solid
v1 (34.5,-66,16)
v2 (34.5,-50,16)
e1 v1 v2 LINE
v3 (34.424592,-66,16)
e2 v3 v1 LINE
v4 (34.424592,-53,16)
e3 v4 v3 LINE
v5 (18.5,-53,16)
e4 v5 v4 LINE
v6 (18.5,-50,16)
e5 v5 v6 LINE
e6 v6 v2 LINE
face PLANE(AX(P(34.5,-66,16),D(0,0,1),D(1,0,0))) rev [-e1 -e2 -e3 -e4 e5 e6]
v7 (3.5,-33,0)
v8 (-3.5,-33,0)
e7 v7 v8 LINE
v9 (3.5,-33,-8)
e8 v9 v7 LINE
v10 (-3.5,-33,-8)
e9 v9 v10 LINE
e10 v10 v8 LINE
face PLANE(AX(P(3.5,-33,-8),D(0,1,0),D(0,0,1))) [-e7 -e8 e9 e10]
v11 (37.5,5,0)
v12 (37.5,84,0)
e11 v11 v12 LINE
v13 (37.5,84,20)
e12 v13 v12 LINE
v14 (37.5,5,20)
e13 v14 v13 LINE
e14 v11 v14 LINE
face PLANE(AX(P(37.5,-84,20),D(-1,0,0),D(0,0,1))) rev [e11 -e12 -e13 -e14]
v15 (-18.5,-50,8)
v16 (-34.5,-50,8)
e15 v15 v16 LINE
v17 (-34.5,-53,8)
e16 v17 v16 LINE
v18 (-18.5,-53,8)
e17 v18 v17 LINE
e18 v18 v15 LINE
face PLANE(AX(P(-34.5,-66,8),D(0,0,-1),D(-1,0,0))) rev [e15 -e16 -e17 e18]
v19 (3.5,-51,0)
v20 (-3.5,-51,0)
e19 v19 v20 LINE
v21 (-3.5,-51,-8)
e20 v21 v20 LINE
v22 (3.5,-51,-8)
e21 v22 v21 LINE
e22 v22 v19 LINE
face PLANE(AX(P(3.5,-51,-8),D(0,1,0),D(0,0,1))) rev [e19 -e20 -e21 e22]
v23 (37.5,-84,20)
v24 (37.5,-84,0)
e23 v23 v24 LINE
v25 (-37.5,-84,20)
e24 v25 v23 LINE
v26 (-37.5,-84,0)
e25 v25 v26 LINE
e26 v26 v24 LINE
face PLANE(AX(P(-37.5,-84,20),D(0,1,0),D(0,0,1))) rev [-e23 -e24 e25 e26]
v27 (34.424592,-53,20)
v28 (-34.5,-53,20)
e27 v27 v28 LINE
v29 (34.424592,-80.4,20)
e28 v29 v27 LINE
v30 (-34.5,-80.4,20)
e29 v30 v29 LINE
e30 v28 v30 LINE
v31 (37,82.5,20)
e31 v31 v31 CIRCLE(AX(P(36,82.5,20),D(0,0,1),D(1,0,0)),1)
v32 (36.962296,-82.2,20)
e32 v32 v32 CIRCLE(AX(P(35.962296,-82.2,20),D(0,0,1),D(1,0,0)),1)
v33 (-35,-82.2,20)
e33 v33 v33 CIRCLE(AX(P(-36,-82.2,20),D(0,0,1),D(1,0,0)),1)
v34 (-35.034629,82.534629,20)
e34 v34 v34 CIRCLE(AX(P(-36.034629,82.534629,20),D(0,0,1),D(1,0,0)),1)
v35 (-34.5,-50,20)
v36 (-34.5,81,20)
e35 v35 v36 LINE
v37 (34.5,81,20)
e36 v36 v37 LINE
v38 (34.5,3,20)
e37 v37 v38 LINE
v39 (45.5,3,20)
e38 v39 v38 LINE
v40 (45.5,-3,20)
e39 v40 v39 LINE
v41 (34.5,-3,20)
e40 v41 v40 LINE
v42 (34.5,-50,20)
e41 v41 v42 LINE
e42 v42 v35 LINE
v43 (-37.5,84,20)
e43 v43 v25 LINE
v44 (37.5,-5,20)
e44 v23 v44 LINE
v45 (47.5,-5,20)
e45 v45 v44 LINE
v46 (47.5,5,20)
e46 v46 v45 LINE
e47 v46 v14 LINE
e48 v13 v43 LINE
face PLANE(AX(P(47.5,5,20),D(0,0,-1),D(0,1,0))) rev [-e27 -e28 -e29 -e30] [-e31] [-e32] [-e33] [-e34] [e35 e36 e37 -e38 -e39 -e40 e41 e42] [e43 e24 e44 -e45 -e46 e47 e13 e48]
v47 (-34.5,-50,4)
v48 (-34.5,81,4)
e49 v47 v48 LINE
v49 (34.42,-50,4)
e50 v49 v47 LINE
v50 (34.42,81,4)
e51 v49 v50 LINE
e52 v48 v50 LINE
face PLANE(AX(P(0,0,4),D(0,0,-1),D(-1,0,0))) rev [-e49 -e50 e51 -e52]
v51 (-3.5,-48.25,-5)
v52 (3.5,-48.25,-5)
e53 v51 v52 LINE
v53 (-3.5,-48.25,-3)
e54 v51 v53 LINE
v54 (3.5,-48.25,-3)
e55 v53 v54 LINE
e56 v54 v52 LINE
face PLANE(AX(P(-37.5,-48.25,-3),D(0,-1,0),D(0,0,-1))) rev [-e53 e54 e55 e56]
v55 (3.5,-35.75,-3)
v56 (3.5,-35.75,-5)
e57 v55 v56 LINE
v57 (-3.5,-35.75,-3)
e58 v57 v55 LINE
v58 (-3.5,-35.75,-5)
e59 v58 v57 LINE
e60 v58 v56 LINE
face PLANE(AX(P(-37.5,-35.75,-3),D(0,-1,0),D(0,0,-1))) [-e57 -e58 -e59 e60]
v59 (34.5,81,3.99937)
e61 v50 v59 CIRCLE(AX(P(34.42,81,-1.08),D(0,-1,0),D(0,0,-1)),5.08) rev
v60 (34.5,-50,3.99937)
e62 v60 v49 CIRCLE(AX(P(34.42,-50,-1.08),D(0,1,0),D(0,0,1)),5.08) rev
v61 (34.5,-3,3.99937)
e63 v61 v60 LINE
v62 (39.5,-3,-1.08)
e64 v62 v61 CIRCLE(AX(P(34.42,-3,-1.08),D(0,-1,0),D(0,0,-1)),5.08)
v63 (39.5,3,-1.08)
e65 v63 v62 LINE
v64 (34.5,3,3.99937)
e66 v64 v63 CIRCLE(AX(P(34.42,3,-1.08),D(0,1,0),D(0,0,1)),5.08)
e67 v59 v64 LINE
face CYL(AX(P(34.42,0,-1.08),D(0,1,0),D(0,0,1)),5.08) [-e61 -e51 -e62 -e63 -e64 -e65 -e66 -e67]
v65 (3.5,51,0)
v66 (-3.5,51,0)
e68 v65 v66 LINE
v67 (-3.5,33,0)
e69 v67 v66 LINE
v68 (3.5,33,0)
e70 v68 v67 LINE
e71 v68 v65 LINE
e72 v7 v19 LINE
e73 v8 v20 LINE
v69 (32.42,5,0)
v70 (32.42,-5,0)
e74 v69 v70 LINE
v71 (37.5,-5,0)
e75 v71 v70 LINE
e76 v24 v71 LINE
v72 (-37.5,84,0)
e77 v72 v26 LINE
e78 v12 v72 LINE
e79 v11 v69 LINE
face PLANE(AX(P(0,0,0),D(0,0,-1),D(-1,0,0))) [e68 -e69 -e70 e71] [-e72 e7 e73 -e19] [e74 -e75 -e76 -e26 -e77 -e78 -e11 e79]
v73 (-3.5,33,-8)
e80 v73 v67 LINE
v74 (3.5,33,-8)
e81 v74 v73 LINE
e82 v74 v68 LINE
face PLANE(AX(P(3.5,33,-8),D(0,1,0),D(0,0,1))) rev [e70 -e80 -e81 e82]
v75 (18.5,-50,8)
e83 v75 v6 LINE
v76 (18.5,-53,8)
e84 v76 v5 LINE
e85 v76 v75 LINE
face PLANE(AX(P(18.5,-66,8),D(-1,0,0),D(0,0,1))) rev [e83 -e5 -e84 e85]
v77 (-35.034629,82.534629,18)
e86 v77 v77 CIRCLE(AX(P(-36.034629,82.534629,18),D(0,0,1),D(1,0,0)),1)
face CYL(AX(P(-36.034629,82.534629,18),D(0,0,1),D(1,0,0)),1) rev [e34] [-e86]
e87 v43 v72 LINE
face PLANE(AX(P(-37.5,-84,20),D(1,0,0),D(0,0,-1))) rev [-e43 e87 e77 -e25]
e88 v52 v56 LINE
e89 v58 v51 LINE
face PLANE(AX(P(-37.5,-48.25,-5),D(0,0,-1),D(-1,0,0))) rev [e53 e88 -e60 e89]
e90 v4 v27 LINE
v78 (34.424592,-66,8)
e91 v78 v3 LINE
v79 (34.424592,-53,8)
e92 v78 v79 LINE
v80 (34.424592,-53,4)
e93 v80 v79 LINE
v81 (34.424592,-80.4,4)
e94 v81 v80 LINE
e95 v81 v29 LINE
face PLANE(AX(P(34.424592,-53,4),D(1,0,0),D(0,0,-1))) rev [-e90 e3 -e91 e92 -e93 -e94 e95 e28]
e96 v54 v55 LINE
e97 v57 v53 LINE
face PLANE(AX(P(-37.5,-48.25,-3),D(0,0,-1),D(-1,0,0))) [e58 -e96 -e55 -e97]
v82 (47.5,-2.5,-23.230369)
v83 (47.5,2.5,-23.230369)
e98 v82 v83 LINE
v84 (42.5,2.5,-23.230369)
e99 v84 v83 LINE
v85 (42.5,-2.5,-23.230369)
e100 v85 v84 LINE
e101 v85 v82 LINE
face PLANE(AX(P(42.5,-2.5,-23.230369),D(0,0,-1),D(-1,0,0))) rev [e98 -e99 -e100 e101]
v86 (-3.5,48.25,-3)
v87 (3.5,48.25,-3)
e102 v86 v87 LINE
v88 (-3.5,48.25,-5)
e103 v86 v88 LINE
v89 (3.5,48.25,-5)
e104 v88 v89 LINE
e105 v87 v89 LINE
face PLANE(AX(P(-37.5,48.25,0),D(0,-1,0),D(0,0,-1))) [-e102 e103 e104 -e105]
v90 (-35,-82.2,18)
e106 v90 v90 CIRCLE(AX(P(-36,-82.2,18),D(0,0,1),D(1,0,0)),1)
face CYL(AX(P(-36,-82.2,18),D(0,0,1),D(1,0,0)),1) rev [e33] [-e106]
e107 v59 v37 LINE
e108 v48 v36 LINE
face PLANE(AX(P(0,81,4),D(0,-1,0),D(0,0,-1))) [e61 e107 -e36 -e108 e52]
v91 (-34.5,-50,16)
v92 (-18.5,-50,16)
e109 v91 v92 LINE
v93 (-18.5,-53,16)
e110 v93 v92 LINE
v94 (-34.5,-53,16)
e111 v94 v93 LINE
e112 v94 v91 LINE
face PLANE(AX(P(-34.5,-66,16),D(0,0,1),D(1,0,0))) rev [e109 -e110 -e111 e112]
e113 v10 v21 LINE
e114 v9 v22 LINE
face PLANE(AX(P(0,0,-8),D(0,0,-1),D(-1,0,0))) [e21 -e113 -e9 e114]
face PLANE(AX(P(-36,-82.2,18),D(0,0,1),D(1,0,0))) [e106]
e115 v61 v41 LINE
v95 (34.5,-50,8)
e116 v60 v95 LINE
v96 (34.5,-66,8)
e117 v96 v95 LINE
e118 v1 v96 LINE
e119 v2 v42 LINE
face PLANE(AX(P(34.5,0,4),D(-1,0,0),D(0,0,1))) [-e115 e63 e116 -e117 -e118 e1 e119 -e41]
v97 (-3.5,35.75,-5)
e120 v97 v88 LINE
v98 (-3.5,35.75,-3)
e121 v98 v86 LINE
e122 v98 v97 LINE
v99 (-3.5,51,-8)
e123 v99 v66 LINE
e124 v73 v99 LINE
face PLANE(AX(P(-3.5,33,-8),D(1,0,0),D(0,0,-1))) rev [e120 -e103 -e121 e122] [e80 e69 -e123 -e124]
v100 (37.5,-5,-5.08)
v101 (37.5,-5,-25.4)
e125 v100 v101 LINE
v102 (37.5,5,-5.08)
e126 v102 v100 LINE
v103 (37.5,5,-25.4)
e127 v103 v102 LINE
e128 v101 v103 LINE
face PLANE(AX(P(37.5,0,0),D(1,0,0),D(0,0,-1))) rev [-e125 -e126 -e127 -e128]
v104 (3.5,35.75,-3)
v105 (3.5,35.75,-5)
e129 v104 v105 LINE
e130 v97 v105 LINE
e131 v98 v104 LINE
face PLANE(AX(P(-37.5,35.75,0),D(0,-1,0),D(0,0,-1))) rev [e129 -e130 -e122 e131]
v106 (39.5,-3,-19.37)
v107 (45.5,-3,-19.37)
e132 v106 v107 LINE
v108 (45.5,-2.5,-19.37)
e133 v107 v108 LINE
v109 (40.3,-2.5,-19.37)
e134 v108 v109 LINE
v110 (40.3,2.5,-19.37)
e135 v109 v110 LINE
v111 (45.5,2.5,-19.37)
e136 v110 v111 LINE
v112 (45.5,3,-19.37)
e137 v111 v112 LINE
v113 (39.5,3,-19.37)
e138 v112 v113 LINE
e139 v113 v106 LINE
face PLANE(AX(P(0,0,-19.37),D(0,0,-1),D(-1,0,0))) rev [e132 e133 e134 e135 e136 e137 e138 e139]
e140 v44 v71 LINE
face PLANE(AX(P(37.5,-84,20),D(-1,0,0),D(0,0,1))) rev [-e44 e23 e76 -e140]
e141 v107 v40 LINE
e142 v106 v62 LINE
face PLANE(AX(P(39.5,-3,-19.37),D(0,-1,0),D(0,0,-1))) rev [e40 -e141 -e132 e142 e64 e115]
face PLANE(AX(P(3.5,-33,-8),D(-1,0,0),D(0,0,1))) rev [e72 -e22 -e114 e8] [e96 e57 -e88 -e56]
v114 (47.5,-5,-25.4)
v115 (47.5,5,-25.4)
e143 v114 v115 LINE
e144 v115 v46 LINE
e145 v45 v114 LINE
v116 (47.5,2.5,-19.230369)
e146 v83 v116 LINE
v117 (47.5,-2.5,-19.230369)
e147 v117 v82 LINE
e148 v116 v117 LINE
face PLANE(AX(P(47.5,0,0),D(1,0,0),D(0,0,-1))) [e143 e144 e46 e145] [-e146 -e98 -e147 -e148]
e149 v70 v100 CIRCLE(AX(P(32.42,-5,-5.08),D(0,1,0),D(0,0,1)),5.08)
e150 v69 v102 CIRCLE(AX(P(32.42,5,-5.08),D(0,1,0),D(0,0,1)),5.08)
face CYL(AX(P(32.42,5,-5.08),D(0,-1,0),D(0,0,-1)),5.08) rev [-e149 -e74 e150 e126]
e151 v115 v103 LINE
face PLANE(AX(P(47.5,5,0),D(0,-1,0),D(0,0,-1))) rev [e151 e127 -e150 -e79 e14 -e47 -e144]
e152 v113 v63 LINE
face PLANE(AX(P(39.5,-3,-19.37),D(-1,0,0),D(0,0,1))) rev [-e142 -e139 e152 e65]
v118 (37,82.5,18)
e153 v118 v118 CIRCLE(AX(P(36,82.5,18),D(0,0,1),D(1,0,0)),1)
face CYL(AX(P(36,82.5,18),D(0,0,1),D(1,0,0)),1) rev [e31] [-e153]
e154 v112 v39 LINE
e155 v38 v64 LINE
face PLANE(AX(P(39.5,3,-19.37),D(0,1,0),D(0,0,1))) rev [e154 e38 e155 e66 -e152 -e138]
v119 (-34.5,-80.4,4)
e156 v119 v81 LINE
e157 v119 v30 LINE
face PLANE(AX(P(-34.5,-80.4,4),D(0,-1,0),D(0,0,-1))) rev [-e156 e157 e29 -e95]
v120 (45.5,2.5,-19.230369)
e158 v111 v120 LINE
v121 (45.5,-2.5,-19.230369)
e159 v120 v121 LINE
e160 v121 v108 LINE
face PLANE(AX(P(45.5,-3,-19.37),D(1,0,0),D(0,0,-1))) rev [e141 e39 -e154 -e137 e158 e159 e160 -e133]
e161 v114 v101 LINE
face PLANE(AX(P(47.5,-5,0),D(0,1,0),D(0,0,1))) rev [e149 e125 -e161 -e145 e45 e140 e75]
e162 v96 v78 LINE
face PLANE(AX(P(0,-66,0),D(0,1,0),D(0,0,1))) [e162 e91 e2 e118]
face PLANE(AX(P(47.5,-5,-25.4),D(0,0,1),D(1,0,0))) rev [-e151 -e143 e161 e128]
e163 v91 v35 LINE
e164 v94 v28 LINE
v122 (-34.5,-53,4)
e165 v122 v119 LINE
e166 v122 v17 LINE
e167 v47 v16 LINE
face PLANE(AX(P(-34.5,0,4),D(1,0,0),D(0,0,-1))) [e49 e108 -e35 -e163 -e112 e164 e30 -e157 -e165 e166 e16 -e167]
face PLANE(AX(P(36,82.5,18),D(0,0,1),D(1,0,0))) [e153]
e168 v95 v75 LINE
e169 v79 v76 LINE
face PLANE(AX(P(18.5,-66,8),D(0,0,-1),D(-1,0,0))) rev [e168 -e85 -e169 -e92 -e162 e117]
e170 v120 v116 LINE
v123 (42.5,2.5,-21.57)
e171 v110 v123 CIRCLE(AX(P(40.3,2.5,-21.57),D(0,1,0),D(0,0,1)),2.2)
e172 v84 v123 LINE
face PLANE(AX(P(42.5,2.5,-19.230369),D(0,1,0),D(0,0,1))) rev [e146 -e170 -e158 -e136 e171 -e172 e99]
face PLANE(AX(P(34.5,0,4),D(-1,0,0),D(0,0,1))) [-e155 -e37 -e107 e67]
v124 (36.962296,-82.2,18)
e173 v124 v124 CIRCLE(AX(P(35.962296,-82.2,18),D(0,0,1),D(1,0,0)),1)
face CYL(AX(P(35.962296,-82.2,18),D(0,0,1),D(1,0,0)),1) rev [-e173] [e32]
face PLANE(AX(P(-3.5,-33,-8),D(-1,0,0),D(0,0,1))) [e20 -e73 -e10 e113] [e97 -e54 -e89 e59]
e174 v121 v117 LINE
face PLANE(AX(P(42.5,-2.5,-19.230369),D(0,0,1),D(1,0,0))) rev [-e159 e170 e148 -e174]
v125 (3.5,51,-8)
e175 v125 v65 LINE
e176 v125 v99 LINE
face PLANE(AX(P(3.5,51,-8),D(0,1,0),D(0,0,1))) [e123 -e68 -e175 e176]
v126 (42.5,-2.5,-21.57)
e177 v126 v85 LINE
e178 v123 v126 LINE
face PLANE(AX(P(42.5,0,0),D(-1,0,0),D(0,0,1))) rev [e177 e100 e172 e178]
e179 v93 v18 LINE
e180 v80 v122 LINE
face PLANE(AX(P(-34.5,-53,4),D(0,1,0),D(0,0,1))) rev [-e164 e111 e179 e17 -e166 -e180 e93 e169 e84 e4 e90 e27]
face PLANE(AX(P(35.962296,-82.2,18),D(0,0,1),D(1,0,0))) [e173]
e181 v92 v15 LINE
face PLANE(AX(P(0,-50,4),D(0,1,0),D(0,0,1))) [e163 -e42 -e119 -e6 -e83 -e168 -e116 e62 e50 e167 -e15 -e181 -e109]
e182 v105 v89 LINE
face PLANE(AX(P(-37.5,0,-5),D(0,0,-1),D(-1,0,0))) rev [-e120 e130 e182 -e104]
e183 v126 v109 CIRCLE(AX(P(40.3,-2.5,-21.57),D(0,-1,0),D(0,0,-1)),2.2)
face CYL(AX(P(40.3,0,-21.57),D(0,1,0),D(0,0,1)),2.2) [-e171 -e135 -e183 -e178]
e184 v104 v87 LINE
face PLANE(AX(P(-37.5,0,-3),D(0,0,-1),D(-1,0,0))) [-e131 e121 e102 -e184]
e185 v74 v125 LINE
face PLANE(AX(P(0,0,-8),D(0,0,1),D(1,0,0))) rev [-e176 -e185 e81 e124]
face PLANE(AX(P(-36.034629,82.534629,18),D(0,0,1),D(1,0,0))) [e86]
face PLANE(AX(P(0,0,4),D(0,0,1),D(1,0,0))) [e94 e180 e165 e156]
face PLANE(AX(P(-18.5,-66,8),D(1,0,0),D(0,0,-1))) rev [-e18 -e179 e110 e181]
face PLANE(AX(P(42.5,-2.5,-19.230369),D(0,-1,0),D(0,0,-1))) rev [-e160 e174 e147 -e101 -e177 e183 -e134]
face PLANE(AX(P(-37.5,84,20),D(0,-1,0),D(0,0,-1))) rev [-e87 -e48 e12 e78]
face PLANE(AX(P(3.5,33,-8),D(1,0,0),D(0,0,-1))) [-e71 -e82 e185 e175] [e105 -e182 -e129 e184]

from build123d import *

# Parameters (mm, degrees)
SKETCH1_W           = 75
SKETCH1_H           = 168
BOSS_EXTRUDE1_DEPTH = 20
BOSS_EXTRUDE2_DEPTH = 10
SKETCH3_W           = 6
SKETCH3_H           = 6
CUT_EXTRUDE2_DEPTH  = 39.37
SKETCH6_W           = 4
SKETCH6_H           = 5
CUT_EXTRUDE4_DEPTH  = 5
SKETCH7_W           = 69
SKETCH7_H           = 131
CUT_EXTRUDE5_DEPTH  = 16
SKETCH8_W           = 68.924591969
SKETCH8_H           = 27.4
CUT_EXTRUDE6_DEPTH  = 16
SKETCH9_W           = 16
SKETCH9_H           = 8
CUT_EXTRUDE7_DEPTH  = 16
SKETCH11_W          = 7.457157679
SKETCH11_H          = 6
CUT_EXTRUDE8_DEPTH  = 16
BOSS_EXTRUDE3_DEPTH = 10
FILLET4_START       = -3
FILLET4_DEPTH       = 6
FILLET4_START_2     = -50
FILLET4_2_DEPTH     = 131
FILLET5_R           = 2.2
SKETCH13_W          = 7
SKETCH13_H          = 18
BOSS_EXTRUDE4_DEPTH = 8
SKETCH14_W          = 2
SKETCH14_H          = 12.5
CUT_EXTRUDE9_DEPTH  = 99.169037889
SKETCH15_W          = 2
SKETCH15_H          = 12.5
CUT_EXTRUDE10_DEPTH = 99.169037889
SKETCH17_R          = 1
CUT_EXTRUDE11_DEPTH = 2


with BuildPart() as part:
    # Sketch1 → Boss-Extrude1 (new body)
    with BuildSketch(Plane.XY):
        Rectangle(SKETCH1_W, SKETCH1_H)
    extrude(amount=BOSS_EXTRUDE1_DEPTH)

    # Sketch7 → Cut-Extrude5 (cut)
    with BuildSketch(Plane.XY.offset(20)):
        with Locations((0, 15.5)):
            Rectangle(SKETCH7_W, SKETCH7_H)
    extrude(amount=-CUT_EXTRUDE5_DEPTH, mode=Mode.SUBTRACT)

    # Sketch8 → Cut-Extrude6 (cut)
    with BuildSketch(Plane.XY.offset(20)):
        with Locations((-0.037704015, -66.7)):
            Rectangle(SKETCH8_W, SKETCH8_H)
    extrude(amount=-CUT_EXTRUDE6_DEPTH, mode=Mode.SUBTRACT)

    # Sketch9 → Cut-Extrude7 (cut)
    with BuildSketch(Plane(origin=(0, -50, 0), x_dir=(1, 0, 0), z_dir=(0, 1, 0))):
        with Locations((-26.5, -12)):
            Rectangle(SKETCH9_W, SKETCH9_H)
        with Locations((26.5, -12)):
            Rectangle(SKETCH9_W, SKETCH9_H)
    extrude(amount=-CUT_EXTRUDE7_DEPTH, mode=Mode.SUBTRACT)


with BuildPart() as body_2:
    # Sketch2 → Boss-Extrude2 (new body)
    with BuildSketch(Plane(origin=(37.5, 0, 0), x_dir=(0, 0, -1), z_dir=(1, 0, 0))):
        Polygon((0, 5), (25.4, 5), (25.4, -5), (0, -5), (-20, -5), (-20, 5), align=None)
    extrude(amount=BOSS_EXTRUDE2_DEPTH)

    # Sketch3 → Cut-Extrude2 (cut)
    with BuildSketch(Plane.XY.offset(20)):
        with Locations((42.5, 0)):
            Rectangle(SKETCH3_W, SKETCH3_H)
    extrude(amount=-CUT_EXTRUDE2_DEPTH, mode=Mode.SUBTRACT)

    # Sketch6 → Cut-Extrude4 (cut)
    with BuildSketch(Plane(origin=(47.5, 0, 0), x_dir=(0, 0, -1), z_dir=(1, 0, 0))):
        with Locations((21.230369208, 0)):
            Rectangle(SKETCH6_W, SKETCH6_H)
    extrude(amount=-CUT_EXTRUDE4_DEPTH, mode=Mode.SUBTRACT)


with BuildPart() as cut_extrude8_tool:
    # Sketch11 → Cut-Extrude8 (new body)
    with BuildSketch(Plane.XY.offset(20)):
        with Locations((35.77142116, 0)):
            Rectangle(SKETCH11_W, SKETCH11_H)
    extrude(amount=-CUT_EXTRUDE8_DEPTH)


with BuildPart() as part_1:
    add(part.part)

    # Cut-Extrude8: cut by cut_extrude8_tool
    add(cut_extrude8_tool.part, mode=Mode.SUBTRACT)



with BuildPart() as body_2_1:
    add(body_2.part)

    # Cut-Extrude8: cut by cut_extrude8_tool
    add(cut_extrude8_tool.part, mode=Mode.SUBTRACT)


with BuildPart() as part_2:
    add(part_1.part)

    add(body_2_1.part)  # Boss-Extrude3 merges body 2
    # Sketch12 → Boss-Extrude3 (add)
    with BuildSketch(Plane.XZ.offset(5)):
        with BuildLine():
            Line((32.42, 0), (37.5, 0))
            Line((37.5, 0), (37.5, -5.08))
            ThreePointArc((37.5, -5.08), (36.012102448, -1.487897552), (32.42, 0))
        make_face()
    extrude(amount=-BOSS_EXTRUDE3_DEPTH)

    # Fillet4: read off the stored shape, not the designer's step
    # Fillet4 outline → Fillet4 (cut)
    with BuildSketch(Plane(origin=(0, 0, 0), x_dir=(1, 0, 0), z_dir=(0, 1, 0)).offset(FILLET4_START)):
        with BuildLine():
            Line((34.42, -4), (39.5, -4))
            Line((39.5, -4), (39.5, 1.08))
            ThreePointArc((39.5, 1.08), (38.012102448, -2.512102448), (34.42, -4))
        make_face()
    extrude(amount=FILLET4_DEPTH, mode=Mode.SUBTRACT)

    # Fillet4 2 outline → Fillet4 2 (cut)
    with BuildSketch(Plane(origin=(0, 0, 0), x_dir=(1, 0, 0), z_dir=(0, 1, 0)).offset(FILLET4_START_2)):
        with BuildLine():
            ThreePointArc((34.5, -3.99937004), (34.46000124, -3.999842507), (34.42, -4))
            Line((34.42, -4), (34.5, -4))
            Line((34.5, -4), (34.5, -3.99937004))
        make_face()
    extrude(amount=FILLET4_2_DEPTH, mode=Mode.SUBTRACT)

    # Fillet5
    fillet5_edges = [part_2.edges().sort_by_distance(p)[0] for p in [
        (42.5, 0, -19.37),
    ]]
    fillet(fillet5_edges, radius=FILLET5_R)

    # Sketch13 → Boss-Extrude4 (add)
    with BuildSketch(Plane(origin=(0, 0, 0), x_dir=(-1, 0, 0), z_dir=(0, 0, -1))):
        with Locations((0, 42)):
            Rectangle(SKETCH13_W, SKETCH13_H)
        with Locations((0, -42)):
            Rectangle(SKETCH13_W, SKETCH13_H)
    extrude(amount=BOSS_EXTRUDE4_DEPTH)

    # Sketch14 → Cut-Extrude9 (cut, through all)
    with BuildSketch(Plane(origin=(3.5, 0, 0), x_dir=(0, 0, -1), z_dir=(1, 0, 0))):
        with Locations((4, 42)):
            Rectangle(SKETCH14_W, SKETCH14_H)
    extrude(amount=-CUT_EXTRUDE9_DEPTH, mode=Mode.SUBTRACT)

    # Sketch15 → Cut-Extrude10 (cut, through all)
    with BuildSketch(Plane(origin=(3.5, 0, 0), x_dir=(0, 0, -1), z_dir=(1, 0, 0))):
        with Locations((4, -42)):
            Rectangle(SKETCH15_W, SKETCH15_H)
    extrude(amount=-CUT_EXTRUDE10_DEPTH, mode=Mode.SUBTRACT)

    # Sketch17 → Cut-Extrude11 (cut)
    with BuildSketch(Plane.XY.offset(20)):
        with Locations((-36.034629261, 82.534629261)):
            Circle(SKETCH17_R)
        with Locations((36, 82.5)):
            Circle(SKETCH17_R)
        with Locations((35.962295985, -82.2)):
            Circle(SKETCH17_R)
        with Locations((-36, -82.2)):
            Circle(SKETCH17_R)
    extrude(amount=-CUT_EXTRUDE11_DEPTH, mode=Mode.SUBTRACT)


solid = part_2.part
